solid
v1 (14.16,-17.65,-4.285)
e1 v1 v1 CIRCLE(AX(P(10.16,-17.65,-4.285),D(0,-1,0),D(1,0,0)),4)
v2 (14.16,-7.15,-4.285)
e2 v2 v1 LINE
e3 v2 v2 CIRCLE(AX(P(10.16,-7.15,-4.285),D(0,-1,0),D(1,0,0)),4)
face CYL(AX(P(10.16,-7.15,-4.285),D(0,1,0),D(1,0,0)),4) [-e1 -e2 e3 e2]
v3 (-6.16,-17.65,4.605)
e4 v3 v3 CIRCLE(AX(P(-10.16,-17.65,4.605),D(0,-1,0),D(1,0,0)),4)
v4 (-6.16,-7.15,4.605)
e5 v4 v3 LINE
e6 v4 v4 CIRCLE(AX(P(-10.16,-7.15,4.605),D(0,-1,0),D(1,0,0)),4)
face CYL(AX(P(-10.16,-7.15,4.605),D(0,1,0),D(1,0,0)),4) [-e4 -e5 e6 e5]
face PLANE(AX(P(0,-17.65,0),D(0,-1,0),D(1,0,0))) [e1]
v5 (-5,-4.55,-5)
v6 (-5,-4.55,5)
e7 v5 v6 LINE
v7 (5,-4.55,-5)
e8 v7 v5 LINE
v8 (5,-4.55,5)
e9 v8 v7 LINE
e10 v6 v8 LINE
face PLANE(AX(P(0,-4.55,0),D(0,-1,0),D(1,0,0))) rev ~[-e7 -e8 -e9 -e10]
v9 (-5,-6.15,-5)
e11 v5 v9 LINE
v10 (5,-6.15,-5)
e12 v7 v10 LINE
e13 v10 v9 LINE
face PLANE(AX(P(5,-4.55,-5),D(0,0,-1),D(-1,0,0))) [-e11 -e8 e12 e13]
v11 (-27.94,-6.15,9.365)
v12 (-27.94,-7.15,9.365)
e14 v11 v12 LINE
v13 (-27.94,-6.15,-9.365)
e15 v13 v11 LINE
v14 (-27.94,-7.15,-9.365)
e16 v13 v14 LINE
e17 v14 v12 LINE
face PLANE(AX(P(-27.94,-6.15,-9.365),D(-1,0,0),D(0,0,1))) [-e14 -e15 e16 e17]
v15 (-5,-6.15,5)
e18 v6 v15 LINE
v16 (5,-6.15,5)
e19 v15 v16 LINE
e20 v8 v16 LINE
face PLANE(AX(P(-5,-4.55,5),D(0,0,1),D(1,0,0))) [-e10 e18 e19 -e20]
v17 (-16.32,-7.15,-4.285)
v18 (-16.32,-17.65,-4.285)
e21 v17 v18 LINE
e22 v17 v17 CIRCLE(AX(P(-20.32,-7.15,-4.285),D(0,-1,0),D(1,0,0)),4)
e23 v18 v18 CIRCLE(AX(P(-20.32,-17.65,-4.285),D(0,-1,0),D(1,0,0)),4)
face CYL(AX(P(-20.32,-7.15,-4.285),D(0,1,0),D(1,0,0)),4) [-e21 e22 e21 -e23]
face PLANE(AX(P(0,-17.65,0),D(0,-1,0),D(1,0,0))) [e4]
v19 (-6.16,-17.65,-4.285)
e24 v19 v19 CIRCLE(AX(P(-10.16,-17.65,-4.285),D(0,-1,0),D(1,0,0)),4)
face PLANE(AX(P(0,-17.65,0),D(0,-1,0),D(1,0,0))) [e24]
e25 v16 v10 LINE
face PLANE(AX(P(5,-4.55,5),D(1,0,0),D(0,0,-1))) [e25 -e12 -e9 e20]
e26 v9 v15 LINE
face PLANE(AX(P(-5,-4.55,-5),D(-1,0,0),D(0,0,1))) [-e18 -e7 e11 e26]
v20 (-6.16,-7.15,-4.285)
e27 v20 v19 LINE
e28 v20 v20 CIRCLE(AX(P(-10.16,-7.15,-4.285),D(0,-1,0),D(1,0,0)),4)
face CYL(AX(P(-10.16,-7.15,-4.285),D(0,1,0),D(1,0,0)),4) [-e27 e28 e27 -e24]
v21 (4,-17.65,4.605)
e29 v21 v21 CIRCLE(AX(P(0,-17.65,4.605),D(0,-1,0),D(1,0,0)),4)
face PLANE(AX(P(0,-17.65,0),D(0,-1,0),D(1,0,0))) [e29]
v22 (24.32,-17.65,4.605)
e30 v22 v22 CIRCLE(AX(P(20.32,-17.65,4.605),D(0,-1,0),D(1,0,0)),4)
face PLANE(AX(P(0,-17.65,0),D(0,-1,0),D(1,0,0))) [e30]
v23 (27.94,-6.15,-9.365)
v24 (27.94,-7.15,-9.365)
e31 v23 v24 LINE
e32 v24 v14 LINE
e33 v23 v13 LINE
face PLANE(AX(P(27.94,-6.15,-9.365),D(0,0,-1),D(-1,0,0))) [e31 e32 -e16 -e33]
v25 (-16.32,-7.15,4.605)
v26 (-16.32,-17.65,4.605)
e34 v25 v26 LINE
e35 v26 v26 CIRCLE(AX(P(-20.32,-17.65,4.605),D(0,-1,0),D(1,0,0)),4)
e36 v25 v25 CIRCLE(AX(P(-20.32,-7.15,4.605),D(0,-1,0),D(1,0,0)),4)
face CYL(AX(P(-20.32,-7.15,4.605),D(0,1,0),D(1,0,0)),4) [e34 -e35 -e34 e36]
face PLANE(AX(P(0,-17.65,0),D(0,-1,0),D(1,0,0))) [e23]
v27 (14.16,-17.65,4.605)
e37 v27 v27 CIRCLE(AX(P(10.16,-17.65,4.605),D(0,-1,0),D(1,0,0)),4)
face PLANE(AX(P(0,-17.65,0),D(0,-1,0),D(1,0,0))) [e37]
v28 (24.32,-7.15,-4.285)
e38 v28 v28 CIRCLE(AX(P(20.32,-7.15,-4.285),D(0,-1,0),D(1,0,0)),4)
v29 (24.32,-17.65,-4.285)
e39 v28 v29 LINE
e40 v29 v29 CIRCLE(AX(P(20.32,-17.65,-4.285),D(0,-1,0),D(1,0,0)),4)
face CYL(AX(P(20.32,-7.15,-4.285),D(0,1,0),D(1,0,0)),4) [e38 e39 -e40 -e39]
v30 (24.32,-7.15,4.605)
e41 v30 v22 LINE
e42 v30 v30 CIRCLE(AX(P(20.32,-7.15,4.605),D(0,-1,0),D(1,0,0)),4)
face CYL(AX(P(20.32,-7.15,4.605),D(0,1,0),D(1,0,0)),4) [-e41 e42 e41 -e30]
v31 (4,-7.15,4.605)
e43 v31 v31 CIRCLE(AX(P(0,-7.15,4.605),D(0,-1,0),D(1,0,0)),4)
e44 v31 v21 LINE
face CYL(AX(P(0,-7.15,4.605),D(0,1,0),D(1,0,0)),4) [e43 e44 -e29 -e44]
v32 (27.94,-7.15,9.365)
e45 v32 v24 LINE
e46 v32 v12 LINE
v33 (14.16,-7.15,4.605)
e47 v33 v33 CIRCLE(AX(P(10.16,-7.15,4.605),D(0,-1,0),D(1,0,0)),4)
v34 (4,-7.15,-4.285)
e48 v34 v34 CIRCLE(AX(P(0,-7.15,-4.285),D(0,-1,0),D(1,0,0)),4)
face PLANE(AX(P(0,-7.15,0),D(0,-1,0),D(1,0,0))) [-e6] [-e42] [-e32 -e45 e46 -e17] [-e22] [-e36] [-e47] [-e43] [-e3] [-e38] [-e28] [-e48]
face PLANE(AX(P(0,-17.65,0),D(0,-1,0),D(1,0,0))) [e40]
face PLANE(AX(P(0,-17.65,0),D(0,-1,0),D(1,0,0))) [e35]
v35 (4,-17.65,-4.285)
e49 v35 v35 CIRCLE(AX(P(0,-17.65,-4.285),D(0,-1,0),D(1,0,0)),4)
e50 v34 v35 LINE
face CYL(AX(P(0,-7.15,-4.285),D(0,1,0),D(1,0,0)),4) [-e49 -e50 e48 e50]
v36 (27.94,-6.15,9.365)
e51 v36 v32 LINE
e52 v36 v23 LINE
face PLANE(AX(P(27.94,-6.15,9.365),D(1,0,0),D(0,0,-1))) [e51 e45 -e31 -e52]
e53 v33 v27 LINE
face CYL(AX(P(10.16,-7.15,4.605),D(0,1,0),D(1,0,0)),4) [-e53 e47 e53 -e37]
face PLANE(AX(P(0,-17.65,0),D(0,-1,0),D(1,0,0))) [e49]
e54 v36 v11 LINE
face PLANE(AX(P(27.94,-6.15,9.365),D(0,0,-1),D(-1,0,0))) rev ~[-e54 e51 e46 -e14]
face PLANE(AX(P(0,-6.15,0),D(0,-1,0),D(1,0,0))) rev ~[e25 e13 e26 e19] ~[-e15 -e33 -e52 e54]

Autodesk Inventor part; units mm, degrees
ref_plane "YZ Plane" through (0, 0, 0) normal (1, 0, 0) x (0, 1, 0)
ref_plane "XZ Plane" through (0, 0, 0) normal (0, 1, 0) x (-1, 0, 0)
ref_plane "XY Plane" through (0, 0, 0) normal (0, 0, 1) x (1, 0, 0)
sketch "Szkic1" plane through (0, 0, 0) normal (0, 1, 0) x (-1, 0, 0)
  line L0 (27.94, 9.365) -> (-27.94, 9.365)
  line L1 (-27.94, 9.365) -> (-27.94, -9.365)
  line L2 (-27.94, -9.365) -> (27.94, -9.365)
  line L3 (27.94, -9.365) -> (27.94, 9.365)
  point P0 (0, 0)
  dimension "d0" = 18.73
  dimension "d1" = 9.365
  dimension "d2" = 55.88
  dimension "d3" = 27.94
extrude "Wyciągnięcie proste1" add sketch "Szkic1" along normal blind 1
sketch "Szkic2" plane through (0, 1, 0) normal (0, 1, 0) x (1, 0, 0)
  line L0 (-25.4, -8.095) -> (-20.32, -8.095)
  line L1 (-20.32, -8.095) -> (-20.32, -2.065)
  line L2 (-20.32, -2.065) -> (-25.4, -2.065)
  line L3 (-25.4, -2.065) -> (-25.4, -8.095)
  line L4 (-27.94, 9.365) -> (-27.94, -9.365) projected
  line L5 (-27.94, -9.365) -> (27.94, -9.365) projected
  line L6 (-19.68, -8.095) -> (-14.6, -8.095)
  line L7 (-14.6, -8.095) -> (-14.6, -2.065)
  line L8 (-14.6, -2.065) -> (-19.68, -2.065)
  line L9 (-19.68, -2.065) -> (-19.68, -8.095)
  line L10 (-13.96, -8.095) -> (-8.88, -8.095)
  line L11 (-8.88, -8.095) -> (-8.88, -2.065)
  line L12 (-8.88, -2.065) -> (-13.96, -2.065)
  line L13 (-13.96, -2.065) -> (-13.96, -8.095)
  line L14 (-8.24, -8.095) -> (-3.16, -8.095)
  line L15 (-3.16, -8.095) -> (-3.16, -2.065)
  line L16 (-3.16, -2.065) -> (-8.24, -2.065)
  line L17 (-8.24, -2.065) -> (-8.24, -8.095)
  line L18 (-2.52, -8.095) -> (2.56, -8.095)
  line L19 (2.56, -8.095) -> (2.56, -2.065)
  line L20 (2.56, -2.065) -> (-2.52, -2.065)
  line L21 (-2.52, -2.065) -> (-2.52, -8.095)
  line L22 (3.2, -8.095) -> (8.28, -8.095)
  line L23 (8.28, -8.095) -> (8.28, -2.065)
  line L24 (8.28, -2.065) -> (3.2, -2.065)
  line L25 (3.2, -2.065) -> (3.2, -8.095)
  line L26 (8.92, -8.095) -> (14, -8.095)
  line L27 (14, -8.095) -> (14, -2.065)
  line L28 (14, -2.065) -> (8.92, -2.065)
  line L29 (8.92, -2.065) -> (8.92, -8.095)
  line L30 (14.64, -8.095) -> (19.72, -8.095)
  line L31 (19.72, -8.095) -> (19.72, -2.065)
  line L32 (19.72, -2.065) -> (14.64, -2.065)
  line L33 (14.64, -2.065) -> (14.64, -8.095)
  line L34 (20.36, -8.095) -> (25.44, -8.095)
  line L35 (25.44, -8.095) -> (25.44, -2.065)
  line L36 (25.44, -2.065) -> (20.36, -2.065)
  line L37 (20.36, -2.065) -> (20.36, -8.095)
  line L38 (-25.4, -0.475) -> (-20.32, -0.475)
  line L39 (-20.32, -0.475) -> (-20.32, 5.555)
  line L40 (-20.32, 5.555) -> (-25.4, 5.555)
  line L41 (-25.4, 5.555) -> (-25.4, -0.475)
  line L42 (-19.68, -0.475) -> (-14.6, -0.475)
  line L43 (-14.6, -0.475) -> (-14.6, 5.555)
  line L44 (-14.6, 5.555) -> (-19.68, 5.555)
  line L45 (-19.68, 5.555) -> (-19.68, -0.475)
  line L46 (-13.96, -0.475) -> (-8.88, -0.475)
  line L47 (-8.88, -0.475) -> (-8.88, 5.555)
  line L48 (-8.88, 5.555) -> (-13.96, 5.555)
  line L49 (-13.96, 5.555) -> (-13.96, -0.475)
  line L50 (19.72, 5.555) -> (14.64, 5.555)
  line L51 (19.72, -0.475) -> (19.72, 5.555)
  line L52 (14.64, -0.475) -> (19.72, -0.475)
  line L53 (14.64, 5.555) -> (14.64, -0.475)
  line L54 (25.44, 5.555) -> (20.36, 5.555)
  line L55 (25.44, -0.475) -> (25.44, 5.555)
  line L56 (20.36, -0.475) -> (25.44, -0.475)
  line L57 (20.36, 5.555) -> (20.36, -0.475)
  line L58 (-3.16, 5.555) -> (-8.24, 5.555)
  line L59 (-3.16, -0.475) -> (-3.16, 5.555)
  line L60 (-8.24, -0.475) -> (-3.16, -0.475)
  line L61 (-8.24, 5.555) -> (-8.24, -0.475)
  line L62 (2.56, 5.555) -> (-2.52, 5.555)
  line L63 (2.56, -0.475) -> (2.56, 5.555)
  line L64 (-2.52, -0.475) -> (2.56, -0.475)
  line L65 (-2.52, 5.555) -> (-2.52, -0.475)
  line L66 (8.28, 5.555) -> (3.2, 5.555)
  line L67 (8.28, -0.475) -> (8.28, 5.555)
  line L68 (3.2, -0.475) -> (8.28, -0.475)
  line L69 (3.2, 5.555) -> (3.2, -0.475)
  line L70 (14, 5.555) -> (8.92, 5.555)
  line L71 (14, -0.475) -> (14, 5.555)
  line L72 (8.92, -0.475) -> (14, -0.475)
  line L73 (8.92, 5.555) -> (8.92, -0.475)
  point P0 (0, 0)
  dimension "d6" = 6.03
  dimension "d7" = 5.08
  dimension "d8" = 2.54
  dimension "d9" = 1.27
  dimension "d10" = 5.08
  dimension "d11" = 6.03
  dimension "d12" = 1.27
  dimension "d13" = 0.64
  dimension "d14" = 5.08
  dimension "d15" = 6.03
  dimension "d16" = 1.27
  dimension "d17" = 0.64
  dimension "d18" = 5.08
  dimension "d19" = 6.03
  dimension "d20" = 1.27
  dimension "d21" = 0.64
  dimension "d22" = 5.08
  dimension "d23" = 6.03
  dimension "d24" = 1.27
  dimension "d25" = 0.64
  dimension "d26" = 5.08
  dimension "d27" = 6.03
  dimension "d28" = 5.08
  dimension "d29" = 6.03
  dimension "d30" = 5.08
  dimension "d31" = 6.03
  dimension "d32" = 5.08
  dimension "d33" = 6.03
  dimension "d34" = 0.64
  dimension "d35" = 0.64
  dimension "d36" = 0.64
  dimension "d37" = 0.64
  dimension "d38" = 1.27
  dimension "d39" = 1.27
  dimension "d40" = 1.27
  dimension "d41" = 1.27
  dimension "d42" = 6.03
  dimension "d43" = 5.08
  dimension "d44" = 6.03
  dimension "d45" = 5.08
  dimension "d46" = 6.03
  dimension "d47" = 5.08
  dimension "d48" = 1.59
  dimension "d49" = 0
  dimension "d50" = 0
  dimension "d51" = 0
  dimension "d52" = 0
  dimension "d53" = 0
  dimension "d54" = 5.08
  dimension "d55" = 6.03
  dimension "d56" = 5.08
  dimension "d57" = 6.03
  dimension "d58" = 0.64
  dimension "d59" = 0
  dimension "d60" = 0
  dimension "d61" = 0
  dimension "d62" = 5.08
  dimension "d63" = 6.03
  dimension "d64" = 5.08
  dimension "d65" = 6.03
  dimension "d66" = 0.64
  dimension "d67" = 0
  dimension "d68" = 0
  dimension "d69" = 0
extrude "Wyciągnięcie proste2" add sketch "Szkic2" along normal blind 1
chamfer "Faza1" distance 0.2 angle 45 4 edges at (22.9, 2, 8.095) (25.44, 2, 5.08) (20.36, 2, 5.08) (22.9, 2, 2.065)
chamfer "Faza2" distance 0.2 angle 45 68 edges at (17.18, 2, 8.095) (19.72, 2, 5.08) (14.64, 2, 5.08) (17.18, 2, 2.065) (14, 2, 5.08) (11.46, 2, 8.095) (8.92, 2, 5.08) (11.46, 2, 2.065) (8.28, 2, 5.08) (5.74, 2, 8.095) (3.2, 2, 5.08) (5.74, 2, 2.065) (0.02, 2, 8.095) (-5.7, 2, 8.095) (-11.42, 2, 8.095) (-17.14, 2, 8.095) (-22.86, 2, 8.095) (-25.4, 2, 5.08) (-22.86, 2, 2.065) (-17.14, 2, 2.065) (-19.68, 2, 5.08) (-14.6, 2, 5.08) (-13.96, 2, 5.08) (-8.88, 2, 5.08) (-11.42, 2, 2.065) (-5.7, 2, 2.065) (-3.16, 2, 5.08) (-8.24, 2, 5.08) (-20.32, 2, 5.08) (-20.32, 2, -2.54) (-22.86, 2, 0.475) (-25.4, 2, -2.54) (-22.86, 2, -5.555) (-17.14, 2, -5.555) (-19.68, 2, -2.54) (-17.14, 2, 0.475) (-14.6, 2, -2.54) (-11.42, 2, 0.475) (-13.96, 2, -2.54) (-11.42, 2, -5.555) (-8.88, 2, -2.54) (-5.7, 2, 0.475) (-8.24, 2, -2.54) (-5.7, 2, -5.555) (-3.16, 2, -2.54) (0.02, 2, 2.065) (-2.52, 2, 5.08) (0.02, 2, 0.475) (-2.52, 2, -2.54) (0.02, 2, -5.555) (2.56, 2, -2.54) (5.74, 2, 0.475) (3.2, 2, -2.54) (5.74, 2, -5.555) (8.28, 2, -2.54) (11.46, 2, 0.475) (8.92, 2, -2.54) (11.46, 2, -5.555) (14, 2, -2.54) (17.18, 2, 0.475) (17.18, 2, -5.555) (14.64, 2, -2.54) (19.72, 2, -2.54) (22.9, 2, 0.475) (20.36, 2, -2.54) (22.9, 2, -5.555) (25.44, 2, -2.54) (2.56, 2, 5.08)
chamfer "Faza3" distance 0.5 angle 45 18 edges at (25.44, 1.4, 8.095) (19.72, 1.4, 8.095) (14, 1.4, 8.095) (8.28, 1.4, 8.095) (2.56, 1.4, 8.095) (2.56, 1.4, 0.475) (8.28, 1.4, 0.475) (14, 1.4, 0.475) (19.72, 1.4, 0.475) (25.44, 1.4, 0.475) (-3.16, 1.4, 0.475) (-3.16, 1.4, 8.095) (-8.88, 1.4, 8.095) (-14.6, 1.4, 8.095) (-8.88, 1.4, 0.475) (-14.6, 1.4, 0.475) (-20.32, 1.4, 0.475) (-20.32, 1.4, 8.095)
sketch "Szkic3" plane through (0, 0, 0) normal (0, -1, 0) x (1, 0, 0)
  line L0 (-25.08, -2.085) -> (-21.9, -2.085)
  line L1 (-21.9, -2.085) -> (-21.9, -8.435)
  line L2 (-21.9, -8.435) -> (-25.08, -8.435)
  line L3 (-25.08, -8.435) -> (-25.08, -2.085)
  line L4 (-25.4, 0.475) -> (-25.4, -5.555) projected
  line L5 (27.94, -9.365) -> (-27.94, -9.365) projected
  line L6 (-19.36, -2.085) -> (-16.18, -2.085)
  line L7 (-16.18, -2.085) -> (-16.18, -8.435)
  line L8 (-16.18, -8.435) -> (-19.36, -8.435)
  line L9 (-19.36, -8.435) -> (-19.36, -2.085)
  line L10 (-19.68, 0.475) -> (-19.68, -5.555) projected
  line L11 (-13.64, -2.085) -> (-10.46, -2.085)
  line L12 (-10.46, -2.085) -> (-10.46, -8.435)
  line L13 (-10.46, -8.435) -> (-13.64, -8.435)
  line L14 (-13.64, -8.435) -> (-13.64, -2.085)
  line L15 (-7.92, -2.085) -> (-4.74, -2.085)
  line L16 (-4.74, -2.085) -> (-4.74, -8.435)
  line L17 (-4.74, -8.435) -> (-7.92, -8.435)
  line L18 (-7.92, -8.435) -> (-7.92, -2.085)
  line L19 (-2.2, -2.085) -> (0.98, -2.085)
  line L20 (0.98, -2.085) -> (0.98, -8.435)
  line L21 (0.98, -8.435) -> (-2.2, -8.435)
  line L22 (-2.2, -8.435) -> (-2.2, -2.085)
  line L23 (3.52, -2.085) -> (6.7, -2.085)
  line L24 (6.7, -2.085) -> (6.7, -8.435)
  line L25 (6.7, -8.435) -> (3.52, -8.435)
  line L26 (3.52, -8.435) -> (3.52, -2.085)
  line L27 (9.24, -2.085) -> (12.42, -2.085)
  line L28 (12.42, -2.085) -> (12.42, -8.435)
  line L29 (12.42, -8.435) -> (9.24, -8.435)
  line L30 (9.24, -8.435) -> (9.24, -2.085)
  line L31 (14.96, -8.435) -> (14.96, -2.085)
  line L32 (14.96, -2.085) -> (18.14, -2.085)
  line L33 (18.14, -2.085) -> (18.14, -8.435)
  line L34 (18.14, -8.435) -> (14.96, -8.435)
  line L35 (20.68, -8.435) -> (20.68, -2.085)
  line L36 (20.68, -2.085) -> (23.86, -2.085)
  line L37 (23.86, -2.085) -> (23.86, -8.435)
  line L38 (23.86, -8.435) -> (20.68, -8.435)
  point P0 (0, 0)
  dimension "d89" = 6.35
  dimension "d90" = 3.18
  dimension "d91" = 0.32
  dimension "d92" = 0.93
  dimension "d93" = 6.35
  dimension "d94" = 3.18
  dimension "d95" = 0.32
  dimension "d96" = 0
  dimension "d97" = 6.35
  dimension "d98" = 3.18
  dimension "d99" = 2.54
  dimension "d100" = 0
  dimension "d101" = 6.35
  dimension "d102" = 3.18
  dimension "d103" = 6.35
  dimension "d104" = 3.18
  dimension "d105" = 6.35
  dimension "d106" = 3.18
  dimension "d107" = 6.35
  dimension "d108" = 3.18
  dimension "d109" = 0
  dimension "d110" = 0
  dimension "d111" = 2.54
  dimension "d112" = 2.54
  dimension "d113" = 2.54
  dimension "d114" = 2.54
  dimension "d115" = 6.35
  dimension "d116" = 3.18
  dimension "d117" = 6.35
  dimension "d118" = 3.18
  dimension "d119" = 2.54
  dimension "d120" = 2.54
extrude "Wyciągnięcie proste3" add sketch "Szkic3" along normal blind 0.35
chamfer "Faza4" distance 0.35 angle 45 18 edges at (22.27, -0.35, -2.085) (16.55, -0.35, -2.085) (10.83, -0.35, -2.085) (5.11, -0.35, -2.085) (-0.61, -0.35, -2.085) (-6.33, -0.35, -2.085) (-12.05, -0.35, -2.085) (-17.77, -0.35, -2.085) (-23.49, -0.35, -2.085) (-23.49, -0.35, -8.435) (-17.77, -0.35, -8.435) (-12.05, -0.35, -8.435) (-6.33, -0.35, -8.435) (-0.61, -0.35, -8.435) (5.11, -0.35, -8.435) (10.83, -0.35, -8.435) (16.55, -0.35, -8.435) (22.27, -0.35, -8.435)
sketch "Szkic4" plane through (0, 0, 0) normal (0, -1, 0) x (1, 0, 0)
  line L0 (-16.32, -0.535) -> (-13.32, -0.535)
  line L1 (-13.32, -0.535) -> (-13.32, -1.935)
  line L2 (-13.32, -1.935) -> (-16.32, -1.935)
  line L3 (-16.32, -1.935) -> (-16.32, -0.535)
  line L4 (-25.08, -2.085) -> (-21.9, -2.085) projected
  line L5 (-10.46, -8.085) -> (-10.46, -2.435) projected
  line L6 (0.84, -0.535) -> (3.84, -0.535)
  line L7 (3.84, -0.535) -> (3.84, -1.935)
  line L8 (3.84, -1.935) -> (0.84, -1.935)
  line L9 (0.84, -1.935) -> (0.84, -0.535)
  line L10 (6.7, -8.085) -> (6.7, -2.435) projected
  line L11 (-2.2, -2.085) -> (0.98, -2.085) projected
  line L12 (18, -0.535) -> (21, -0.535)
  line L13 (21, -0.535) -> (21, -1.935)
  line L14 (21, -1.935) -> (18, -1.935)
  line L15 (18, -1.935) -> (18, -0.535)
  line L16 (23.86, -8.085) -> (23.86, -2.435) projected
  line L17 (14.96, -2.085) -> (18.14, -2.085) projected
  point P0 (0, 0)
  dimension "d126" = 1.4
  dimension "d127" = 3
  dimension "d128" = 0.15
  dimension "d129" = 2.86
  dimension "d130" = 1.4
  dimension "d131" = 3
  dimension "d132" = 2.86
  dimension "d133" = 0.15
  dimension "d134" = 1.4
  dimension "d135" = 3
  dimension "d136" = 2.86
  dimension "d137" = 0.15
extrude "Wyciągnięcie proste4" add sketch "Szkic4" along normal blind 1.1
chamfer "Faza5" distance 0.6 angle 25 1 edges at (-14.82, -1.1, -0.535) measured on face at (-15.32, -0.3667, -0.535)
chamfer "Faza6" distance 0.6 angle 25 1 edges at (2.34, -1.1, -0.535) measured on face at (1.84, -0.3667, -0.535)
chamfer "Faza7" distance 0.6 angle 25 1 edges at (19.5, -1.1, -0.535) measured on face at (19, -0.3667, -0.535)
chamfer "Faza8" distance 0.6 angle 25 1 edges at (19.5, -1.1, -1.935) measured on face at (20, -0.3667, -1.935)
chamfer "Faza9" distance 0.6 angle 25 1 edges at (2.34, -1.1, -1.935) measured on face at (2.84, -0.3667, -1.935)
chamfer "Faza10" distance 0.6 angle 25 1 edges at (-14.82, -1.1, -1.935) measured on face at (-14.32, -0.3667, -1.935)
chamfer "Faza11" distance 0.6 angle 25 1 edges at (-13.32, -1.1, -1.235) measured on face at (-13.32, -0.7, -1.0949)
chamfer "Faza12" distance 0.6 angle 25 1 edges at (3.84, -1.1, -1.235) measured on face at (3.84, -0.7, -1.0949)
chamfer "Faza13" distance 0.6 angle 25 1 edges at (21, -1.1, -1.235) measured on face at (21, -0.7, -1.0949)
chamfer "Faza14" distance 0.6 angle 25 1 edges at (18, -1.1, -1.235) measured on face at (18, -0.7, -1.3751)
chamfer "Faza15" distance 0.6 angle 25 1 edges at (0.84, -1.1, -1.235) measured on face at (0.84, -0.7, -1.3751)
chamfer "Faza16" distance 0.6 angle 25 1 edges at (-16.32, -1.1, -1.235) measured on face at (-16.32, -0.7, -1.3751)
ref_plane "Płaszczyzna konstrukcyjna1" through (0, -3.55, 0) normal (0, -1, 0) x (1, 0, 0)
sketch "Szkic5" plane through (0, -3.55, 0) normal (0, -1, 0) x (1, 0, 0)
  line L0 (-22.54, 4.285) -> (-15.54, 4.285)
  line L1 (-15.54, 4.285) -> (-15.54, -2.715)
  line L2 (-15.54, -2.715) -> (-22.54, -2.715)
  line L3 (-22.54, -2.715) -> (-22.54, 4.285)
  line L4 (-27.94, -9.365) -> (-27.94, 9.365) projected
  line L5 (-27.94, 9.365) -> (27.94, 9.365) projected
  line L6 (-3.5, 4.285) -> (3.5, 4.285)
  line L7 (3.5, 4.285) -> (3.5, -2.715)
  line L8 (3.5, -2.715) -> (-3.5, -2.715)
  line L9 (-3.5, -2.715) -> (-3.5, 4.285)
  line L10 (15.54, 4.285) -> (22.54, 4.285)
  line L11 (22.54, 4.285) -> (22.54, -2.715)
  line L12 (22.54, -2.715) -> (15.54, -2.715)
  line L13 (15.54, -2.715) -> (15.54, 4.285)
  line L14 (27.94, 9.365) -> (27.94, -9.365) projected
  point P0 (0, 0)
  dimension "d177" = 7
  dimension "d178" = 7
  dimension "d179" = 5.4
  dimension "d180" = 5.08
  dimension "d181" = 7
  dimension "d182" = 7
  dimension "d183" = 7
  dimension "d184" = 7
  dimension "d185" = 5.4
  dimension "d186" = 0
  dimension "d187" = 0
  dimension "d188" = 3.5
extrude "Wyciągnięcie proste5" add sketch "Szkic5" along normal blind 1
sketch "Szkic6" plane through (0, -3.55, 0) normal (0, 1, 0) x (1, 0, 0)
  line L0 (27.94, 9.365) -> (-27.94, 9.365) projected
  line L1 (-27.94, -9.365) -> (27.94, -9.365) projected
  line L2 (-27.94, 9.365) -> (27.94, 9.365)
  line L3 (27.94, 9.365) -> (27.94, -9.365)
  line L4 (27.94, -9.365) -> (-27.94, -9.365)
  line L5 (-27.94, -9.365) -> (-27.94, 9.365)
  point P0 (0, 0)
extrude "Wyciągnięcie proste6" add sketch "Szkic6" along normal blind 1
sketch "Szkic7" plane through (0, -4.55, 0) normal (0, -1, 0) x (1, 0, 0)
  line L0 (-5, 5) -> (5, 5)
  line L1 (5, 5) -> (5, -5)
  line L2 (5, -5) -> (-5, -5)
  line L3 (-5, -5) -> (-5, 5)
  point P0 (0, 0)
  dimension "d193" = 10
  dimension "d194" = 10
  dimension "d195" = 5
  dimension "d196" = 5
extrude "Wyciągnięcie proste7" add sketch "Szkic7" along normal blind 1.6
sketch "Szkic8" plane through (0, -6.15, 0) normal (0, -1, 0) x (1, 0, 0)
  line L0 (27.94, 9.365) -> (27.94, -9.365) projected
  line L1 (27.94, 9.365) -> (-27.94, 9.365) projected
  line L2 (27.94, -9.365) -> (-27.94, -9.365)
  line L3 (-27.94, -9.365) -> (-27.94, 9.365)
  line L4 (-27.94, 9.365) -> (27.94, 9.365)
  line L5 (27.94, 9.365) -> (27.94, -9.365)
  point P0 (0, 0)
extrude "Wyciągnięcie proste8" add sketch "Szkic8" along normal blind 1
sketch "Szkic9" plane through (0, -7.15, 0) normal (0, -1, 0) x (1, 0, 0)
  circle A0 centre (20.32, -4.285) radius 4
  circle A1 centre (20.32, 4.605) radius 4
  line L0 (27.94, -9.365) -> (27.94, 9.365) projected
  circle A2 centre (10.16, -4.285) radius 4
  circle A3 centre (10.16, 4.605) radius 4
  circle A4 centre (0, -4.285) radius 4
  circle A5 centre (-10.16, -4.285) radius 4
  circle A6 centre (-20.32, -4.285) radius 4
  circle A7 centre (0, 4.605) radius 4
  circle A8 centre (-10.16, 4.605) radius 4
  line L1 (-20.32, 7.595) -> (-20.32, 2.065) projected
  circle A9 centre (-20.32, 4.605) radius 4
  line L2 (-27.94, -9.365) -> (27.94, -9.365) projected
  point P0 (0, 0)
  dimension "d201" = 8
  dimension "d202" = 8
  dimension "d203" = 8.89
  dimension "d204" = 7.62
  dimension "d205" = 7.62
  dimension "d206" = 8
  dimension "d207" = 10.16
  dimension "d208" = 0
  dimension "d209" = 8
  dimension "d210" = 8
  dimension "d211" = 8
  dimension "d212" = 8
  dimension "d213" = 10.16
  dimension "d214" = 10.16
  dimension "d215" = 10.16
  dimension "d216" = 8
  dimension "d217" = 8
  dimension "d218" = 8
  dimension "d219" = 5.08
  dimension "d220" = 0
  dimension "d221" = 0
  dimension "d222" = 0
  dimension "d223" = 0
extrude "Wyciągnięcie proste9" add sketch "Szkic9" along normal blind 10.5
sketch "Sketch10" plane through (0, -4.55, 0) normal (0, 1, 0) x (1, 0, 0)
  line L0 (-27.94, -9.365) -> (27.94, -9.365)
  line L1 (27.94, -9.365) -> (27.94, 9.365)
  line L2 (27.94, 9.365) -> (-27.94, 9.365)
  line L3 (-27.94, 9.365) -> (-27.94, -9.365)
  point P0 (0, 0)
extrude "Extrusion10" cut sketch "Sketch10" along normal blind 10
properties part number "UberDriver_1" material "Silver"
